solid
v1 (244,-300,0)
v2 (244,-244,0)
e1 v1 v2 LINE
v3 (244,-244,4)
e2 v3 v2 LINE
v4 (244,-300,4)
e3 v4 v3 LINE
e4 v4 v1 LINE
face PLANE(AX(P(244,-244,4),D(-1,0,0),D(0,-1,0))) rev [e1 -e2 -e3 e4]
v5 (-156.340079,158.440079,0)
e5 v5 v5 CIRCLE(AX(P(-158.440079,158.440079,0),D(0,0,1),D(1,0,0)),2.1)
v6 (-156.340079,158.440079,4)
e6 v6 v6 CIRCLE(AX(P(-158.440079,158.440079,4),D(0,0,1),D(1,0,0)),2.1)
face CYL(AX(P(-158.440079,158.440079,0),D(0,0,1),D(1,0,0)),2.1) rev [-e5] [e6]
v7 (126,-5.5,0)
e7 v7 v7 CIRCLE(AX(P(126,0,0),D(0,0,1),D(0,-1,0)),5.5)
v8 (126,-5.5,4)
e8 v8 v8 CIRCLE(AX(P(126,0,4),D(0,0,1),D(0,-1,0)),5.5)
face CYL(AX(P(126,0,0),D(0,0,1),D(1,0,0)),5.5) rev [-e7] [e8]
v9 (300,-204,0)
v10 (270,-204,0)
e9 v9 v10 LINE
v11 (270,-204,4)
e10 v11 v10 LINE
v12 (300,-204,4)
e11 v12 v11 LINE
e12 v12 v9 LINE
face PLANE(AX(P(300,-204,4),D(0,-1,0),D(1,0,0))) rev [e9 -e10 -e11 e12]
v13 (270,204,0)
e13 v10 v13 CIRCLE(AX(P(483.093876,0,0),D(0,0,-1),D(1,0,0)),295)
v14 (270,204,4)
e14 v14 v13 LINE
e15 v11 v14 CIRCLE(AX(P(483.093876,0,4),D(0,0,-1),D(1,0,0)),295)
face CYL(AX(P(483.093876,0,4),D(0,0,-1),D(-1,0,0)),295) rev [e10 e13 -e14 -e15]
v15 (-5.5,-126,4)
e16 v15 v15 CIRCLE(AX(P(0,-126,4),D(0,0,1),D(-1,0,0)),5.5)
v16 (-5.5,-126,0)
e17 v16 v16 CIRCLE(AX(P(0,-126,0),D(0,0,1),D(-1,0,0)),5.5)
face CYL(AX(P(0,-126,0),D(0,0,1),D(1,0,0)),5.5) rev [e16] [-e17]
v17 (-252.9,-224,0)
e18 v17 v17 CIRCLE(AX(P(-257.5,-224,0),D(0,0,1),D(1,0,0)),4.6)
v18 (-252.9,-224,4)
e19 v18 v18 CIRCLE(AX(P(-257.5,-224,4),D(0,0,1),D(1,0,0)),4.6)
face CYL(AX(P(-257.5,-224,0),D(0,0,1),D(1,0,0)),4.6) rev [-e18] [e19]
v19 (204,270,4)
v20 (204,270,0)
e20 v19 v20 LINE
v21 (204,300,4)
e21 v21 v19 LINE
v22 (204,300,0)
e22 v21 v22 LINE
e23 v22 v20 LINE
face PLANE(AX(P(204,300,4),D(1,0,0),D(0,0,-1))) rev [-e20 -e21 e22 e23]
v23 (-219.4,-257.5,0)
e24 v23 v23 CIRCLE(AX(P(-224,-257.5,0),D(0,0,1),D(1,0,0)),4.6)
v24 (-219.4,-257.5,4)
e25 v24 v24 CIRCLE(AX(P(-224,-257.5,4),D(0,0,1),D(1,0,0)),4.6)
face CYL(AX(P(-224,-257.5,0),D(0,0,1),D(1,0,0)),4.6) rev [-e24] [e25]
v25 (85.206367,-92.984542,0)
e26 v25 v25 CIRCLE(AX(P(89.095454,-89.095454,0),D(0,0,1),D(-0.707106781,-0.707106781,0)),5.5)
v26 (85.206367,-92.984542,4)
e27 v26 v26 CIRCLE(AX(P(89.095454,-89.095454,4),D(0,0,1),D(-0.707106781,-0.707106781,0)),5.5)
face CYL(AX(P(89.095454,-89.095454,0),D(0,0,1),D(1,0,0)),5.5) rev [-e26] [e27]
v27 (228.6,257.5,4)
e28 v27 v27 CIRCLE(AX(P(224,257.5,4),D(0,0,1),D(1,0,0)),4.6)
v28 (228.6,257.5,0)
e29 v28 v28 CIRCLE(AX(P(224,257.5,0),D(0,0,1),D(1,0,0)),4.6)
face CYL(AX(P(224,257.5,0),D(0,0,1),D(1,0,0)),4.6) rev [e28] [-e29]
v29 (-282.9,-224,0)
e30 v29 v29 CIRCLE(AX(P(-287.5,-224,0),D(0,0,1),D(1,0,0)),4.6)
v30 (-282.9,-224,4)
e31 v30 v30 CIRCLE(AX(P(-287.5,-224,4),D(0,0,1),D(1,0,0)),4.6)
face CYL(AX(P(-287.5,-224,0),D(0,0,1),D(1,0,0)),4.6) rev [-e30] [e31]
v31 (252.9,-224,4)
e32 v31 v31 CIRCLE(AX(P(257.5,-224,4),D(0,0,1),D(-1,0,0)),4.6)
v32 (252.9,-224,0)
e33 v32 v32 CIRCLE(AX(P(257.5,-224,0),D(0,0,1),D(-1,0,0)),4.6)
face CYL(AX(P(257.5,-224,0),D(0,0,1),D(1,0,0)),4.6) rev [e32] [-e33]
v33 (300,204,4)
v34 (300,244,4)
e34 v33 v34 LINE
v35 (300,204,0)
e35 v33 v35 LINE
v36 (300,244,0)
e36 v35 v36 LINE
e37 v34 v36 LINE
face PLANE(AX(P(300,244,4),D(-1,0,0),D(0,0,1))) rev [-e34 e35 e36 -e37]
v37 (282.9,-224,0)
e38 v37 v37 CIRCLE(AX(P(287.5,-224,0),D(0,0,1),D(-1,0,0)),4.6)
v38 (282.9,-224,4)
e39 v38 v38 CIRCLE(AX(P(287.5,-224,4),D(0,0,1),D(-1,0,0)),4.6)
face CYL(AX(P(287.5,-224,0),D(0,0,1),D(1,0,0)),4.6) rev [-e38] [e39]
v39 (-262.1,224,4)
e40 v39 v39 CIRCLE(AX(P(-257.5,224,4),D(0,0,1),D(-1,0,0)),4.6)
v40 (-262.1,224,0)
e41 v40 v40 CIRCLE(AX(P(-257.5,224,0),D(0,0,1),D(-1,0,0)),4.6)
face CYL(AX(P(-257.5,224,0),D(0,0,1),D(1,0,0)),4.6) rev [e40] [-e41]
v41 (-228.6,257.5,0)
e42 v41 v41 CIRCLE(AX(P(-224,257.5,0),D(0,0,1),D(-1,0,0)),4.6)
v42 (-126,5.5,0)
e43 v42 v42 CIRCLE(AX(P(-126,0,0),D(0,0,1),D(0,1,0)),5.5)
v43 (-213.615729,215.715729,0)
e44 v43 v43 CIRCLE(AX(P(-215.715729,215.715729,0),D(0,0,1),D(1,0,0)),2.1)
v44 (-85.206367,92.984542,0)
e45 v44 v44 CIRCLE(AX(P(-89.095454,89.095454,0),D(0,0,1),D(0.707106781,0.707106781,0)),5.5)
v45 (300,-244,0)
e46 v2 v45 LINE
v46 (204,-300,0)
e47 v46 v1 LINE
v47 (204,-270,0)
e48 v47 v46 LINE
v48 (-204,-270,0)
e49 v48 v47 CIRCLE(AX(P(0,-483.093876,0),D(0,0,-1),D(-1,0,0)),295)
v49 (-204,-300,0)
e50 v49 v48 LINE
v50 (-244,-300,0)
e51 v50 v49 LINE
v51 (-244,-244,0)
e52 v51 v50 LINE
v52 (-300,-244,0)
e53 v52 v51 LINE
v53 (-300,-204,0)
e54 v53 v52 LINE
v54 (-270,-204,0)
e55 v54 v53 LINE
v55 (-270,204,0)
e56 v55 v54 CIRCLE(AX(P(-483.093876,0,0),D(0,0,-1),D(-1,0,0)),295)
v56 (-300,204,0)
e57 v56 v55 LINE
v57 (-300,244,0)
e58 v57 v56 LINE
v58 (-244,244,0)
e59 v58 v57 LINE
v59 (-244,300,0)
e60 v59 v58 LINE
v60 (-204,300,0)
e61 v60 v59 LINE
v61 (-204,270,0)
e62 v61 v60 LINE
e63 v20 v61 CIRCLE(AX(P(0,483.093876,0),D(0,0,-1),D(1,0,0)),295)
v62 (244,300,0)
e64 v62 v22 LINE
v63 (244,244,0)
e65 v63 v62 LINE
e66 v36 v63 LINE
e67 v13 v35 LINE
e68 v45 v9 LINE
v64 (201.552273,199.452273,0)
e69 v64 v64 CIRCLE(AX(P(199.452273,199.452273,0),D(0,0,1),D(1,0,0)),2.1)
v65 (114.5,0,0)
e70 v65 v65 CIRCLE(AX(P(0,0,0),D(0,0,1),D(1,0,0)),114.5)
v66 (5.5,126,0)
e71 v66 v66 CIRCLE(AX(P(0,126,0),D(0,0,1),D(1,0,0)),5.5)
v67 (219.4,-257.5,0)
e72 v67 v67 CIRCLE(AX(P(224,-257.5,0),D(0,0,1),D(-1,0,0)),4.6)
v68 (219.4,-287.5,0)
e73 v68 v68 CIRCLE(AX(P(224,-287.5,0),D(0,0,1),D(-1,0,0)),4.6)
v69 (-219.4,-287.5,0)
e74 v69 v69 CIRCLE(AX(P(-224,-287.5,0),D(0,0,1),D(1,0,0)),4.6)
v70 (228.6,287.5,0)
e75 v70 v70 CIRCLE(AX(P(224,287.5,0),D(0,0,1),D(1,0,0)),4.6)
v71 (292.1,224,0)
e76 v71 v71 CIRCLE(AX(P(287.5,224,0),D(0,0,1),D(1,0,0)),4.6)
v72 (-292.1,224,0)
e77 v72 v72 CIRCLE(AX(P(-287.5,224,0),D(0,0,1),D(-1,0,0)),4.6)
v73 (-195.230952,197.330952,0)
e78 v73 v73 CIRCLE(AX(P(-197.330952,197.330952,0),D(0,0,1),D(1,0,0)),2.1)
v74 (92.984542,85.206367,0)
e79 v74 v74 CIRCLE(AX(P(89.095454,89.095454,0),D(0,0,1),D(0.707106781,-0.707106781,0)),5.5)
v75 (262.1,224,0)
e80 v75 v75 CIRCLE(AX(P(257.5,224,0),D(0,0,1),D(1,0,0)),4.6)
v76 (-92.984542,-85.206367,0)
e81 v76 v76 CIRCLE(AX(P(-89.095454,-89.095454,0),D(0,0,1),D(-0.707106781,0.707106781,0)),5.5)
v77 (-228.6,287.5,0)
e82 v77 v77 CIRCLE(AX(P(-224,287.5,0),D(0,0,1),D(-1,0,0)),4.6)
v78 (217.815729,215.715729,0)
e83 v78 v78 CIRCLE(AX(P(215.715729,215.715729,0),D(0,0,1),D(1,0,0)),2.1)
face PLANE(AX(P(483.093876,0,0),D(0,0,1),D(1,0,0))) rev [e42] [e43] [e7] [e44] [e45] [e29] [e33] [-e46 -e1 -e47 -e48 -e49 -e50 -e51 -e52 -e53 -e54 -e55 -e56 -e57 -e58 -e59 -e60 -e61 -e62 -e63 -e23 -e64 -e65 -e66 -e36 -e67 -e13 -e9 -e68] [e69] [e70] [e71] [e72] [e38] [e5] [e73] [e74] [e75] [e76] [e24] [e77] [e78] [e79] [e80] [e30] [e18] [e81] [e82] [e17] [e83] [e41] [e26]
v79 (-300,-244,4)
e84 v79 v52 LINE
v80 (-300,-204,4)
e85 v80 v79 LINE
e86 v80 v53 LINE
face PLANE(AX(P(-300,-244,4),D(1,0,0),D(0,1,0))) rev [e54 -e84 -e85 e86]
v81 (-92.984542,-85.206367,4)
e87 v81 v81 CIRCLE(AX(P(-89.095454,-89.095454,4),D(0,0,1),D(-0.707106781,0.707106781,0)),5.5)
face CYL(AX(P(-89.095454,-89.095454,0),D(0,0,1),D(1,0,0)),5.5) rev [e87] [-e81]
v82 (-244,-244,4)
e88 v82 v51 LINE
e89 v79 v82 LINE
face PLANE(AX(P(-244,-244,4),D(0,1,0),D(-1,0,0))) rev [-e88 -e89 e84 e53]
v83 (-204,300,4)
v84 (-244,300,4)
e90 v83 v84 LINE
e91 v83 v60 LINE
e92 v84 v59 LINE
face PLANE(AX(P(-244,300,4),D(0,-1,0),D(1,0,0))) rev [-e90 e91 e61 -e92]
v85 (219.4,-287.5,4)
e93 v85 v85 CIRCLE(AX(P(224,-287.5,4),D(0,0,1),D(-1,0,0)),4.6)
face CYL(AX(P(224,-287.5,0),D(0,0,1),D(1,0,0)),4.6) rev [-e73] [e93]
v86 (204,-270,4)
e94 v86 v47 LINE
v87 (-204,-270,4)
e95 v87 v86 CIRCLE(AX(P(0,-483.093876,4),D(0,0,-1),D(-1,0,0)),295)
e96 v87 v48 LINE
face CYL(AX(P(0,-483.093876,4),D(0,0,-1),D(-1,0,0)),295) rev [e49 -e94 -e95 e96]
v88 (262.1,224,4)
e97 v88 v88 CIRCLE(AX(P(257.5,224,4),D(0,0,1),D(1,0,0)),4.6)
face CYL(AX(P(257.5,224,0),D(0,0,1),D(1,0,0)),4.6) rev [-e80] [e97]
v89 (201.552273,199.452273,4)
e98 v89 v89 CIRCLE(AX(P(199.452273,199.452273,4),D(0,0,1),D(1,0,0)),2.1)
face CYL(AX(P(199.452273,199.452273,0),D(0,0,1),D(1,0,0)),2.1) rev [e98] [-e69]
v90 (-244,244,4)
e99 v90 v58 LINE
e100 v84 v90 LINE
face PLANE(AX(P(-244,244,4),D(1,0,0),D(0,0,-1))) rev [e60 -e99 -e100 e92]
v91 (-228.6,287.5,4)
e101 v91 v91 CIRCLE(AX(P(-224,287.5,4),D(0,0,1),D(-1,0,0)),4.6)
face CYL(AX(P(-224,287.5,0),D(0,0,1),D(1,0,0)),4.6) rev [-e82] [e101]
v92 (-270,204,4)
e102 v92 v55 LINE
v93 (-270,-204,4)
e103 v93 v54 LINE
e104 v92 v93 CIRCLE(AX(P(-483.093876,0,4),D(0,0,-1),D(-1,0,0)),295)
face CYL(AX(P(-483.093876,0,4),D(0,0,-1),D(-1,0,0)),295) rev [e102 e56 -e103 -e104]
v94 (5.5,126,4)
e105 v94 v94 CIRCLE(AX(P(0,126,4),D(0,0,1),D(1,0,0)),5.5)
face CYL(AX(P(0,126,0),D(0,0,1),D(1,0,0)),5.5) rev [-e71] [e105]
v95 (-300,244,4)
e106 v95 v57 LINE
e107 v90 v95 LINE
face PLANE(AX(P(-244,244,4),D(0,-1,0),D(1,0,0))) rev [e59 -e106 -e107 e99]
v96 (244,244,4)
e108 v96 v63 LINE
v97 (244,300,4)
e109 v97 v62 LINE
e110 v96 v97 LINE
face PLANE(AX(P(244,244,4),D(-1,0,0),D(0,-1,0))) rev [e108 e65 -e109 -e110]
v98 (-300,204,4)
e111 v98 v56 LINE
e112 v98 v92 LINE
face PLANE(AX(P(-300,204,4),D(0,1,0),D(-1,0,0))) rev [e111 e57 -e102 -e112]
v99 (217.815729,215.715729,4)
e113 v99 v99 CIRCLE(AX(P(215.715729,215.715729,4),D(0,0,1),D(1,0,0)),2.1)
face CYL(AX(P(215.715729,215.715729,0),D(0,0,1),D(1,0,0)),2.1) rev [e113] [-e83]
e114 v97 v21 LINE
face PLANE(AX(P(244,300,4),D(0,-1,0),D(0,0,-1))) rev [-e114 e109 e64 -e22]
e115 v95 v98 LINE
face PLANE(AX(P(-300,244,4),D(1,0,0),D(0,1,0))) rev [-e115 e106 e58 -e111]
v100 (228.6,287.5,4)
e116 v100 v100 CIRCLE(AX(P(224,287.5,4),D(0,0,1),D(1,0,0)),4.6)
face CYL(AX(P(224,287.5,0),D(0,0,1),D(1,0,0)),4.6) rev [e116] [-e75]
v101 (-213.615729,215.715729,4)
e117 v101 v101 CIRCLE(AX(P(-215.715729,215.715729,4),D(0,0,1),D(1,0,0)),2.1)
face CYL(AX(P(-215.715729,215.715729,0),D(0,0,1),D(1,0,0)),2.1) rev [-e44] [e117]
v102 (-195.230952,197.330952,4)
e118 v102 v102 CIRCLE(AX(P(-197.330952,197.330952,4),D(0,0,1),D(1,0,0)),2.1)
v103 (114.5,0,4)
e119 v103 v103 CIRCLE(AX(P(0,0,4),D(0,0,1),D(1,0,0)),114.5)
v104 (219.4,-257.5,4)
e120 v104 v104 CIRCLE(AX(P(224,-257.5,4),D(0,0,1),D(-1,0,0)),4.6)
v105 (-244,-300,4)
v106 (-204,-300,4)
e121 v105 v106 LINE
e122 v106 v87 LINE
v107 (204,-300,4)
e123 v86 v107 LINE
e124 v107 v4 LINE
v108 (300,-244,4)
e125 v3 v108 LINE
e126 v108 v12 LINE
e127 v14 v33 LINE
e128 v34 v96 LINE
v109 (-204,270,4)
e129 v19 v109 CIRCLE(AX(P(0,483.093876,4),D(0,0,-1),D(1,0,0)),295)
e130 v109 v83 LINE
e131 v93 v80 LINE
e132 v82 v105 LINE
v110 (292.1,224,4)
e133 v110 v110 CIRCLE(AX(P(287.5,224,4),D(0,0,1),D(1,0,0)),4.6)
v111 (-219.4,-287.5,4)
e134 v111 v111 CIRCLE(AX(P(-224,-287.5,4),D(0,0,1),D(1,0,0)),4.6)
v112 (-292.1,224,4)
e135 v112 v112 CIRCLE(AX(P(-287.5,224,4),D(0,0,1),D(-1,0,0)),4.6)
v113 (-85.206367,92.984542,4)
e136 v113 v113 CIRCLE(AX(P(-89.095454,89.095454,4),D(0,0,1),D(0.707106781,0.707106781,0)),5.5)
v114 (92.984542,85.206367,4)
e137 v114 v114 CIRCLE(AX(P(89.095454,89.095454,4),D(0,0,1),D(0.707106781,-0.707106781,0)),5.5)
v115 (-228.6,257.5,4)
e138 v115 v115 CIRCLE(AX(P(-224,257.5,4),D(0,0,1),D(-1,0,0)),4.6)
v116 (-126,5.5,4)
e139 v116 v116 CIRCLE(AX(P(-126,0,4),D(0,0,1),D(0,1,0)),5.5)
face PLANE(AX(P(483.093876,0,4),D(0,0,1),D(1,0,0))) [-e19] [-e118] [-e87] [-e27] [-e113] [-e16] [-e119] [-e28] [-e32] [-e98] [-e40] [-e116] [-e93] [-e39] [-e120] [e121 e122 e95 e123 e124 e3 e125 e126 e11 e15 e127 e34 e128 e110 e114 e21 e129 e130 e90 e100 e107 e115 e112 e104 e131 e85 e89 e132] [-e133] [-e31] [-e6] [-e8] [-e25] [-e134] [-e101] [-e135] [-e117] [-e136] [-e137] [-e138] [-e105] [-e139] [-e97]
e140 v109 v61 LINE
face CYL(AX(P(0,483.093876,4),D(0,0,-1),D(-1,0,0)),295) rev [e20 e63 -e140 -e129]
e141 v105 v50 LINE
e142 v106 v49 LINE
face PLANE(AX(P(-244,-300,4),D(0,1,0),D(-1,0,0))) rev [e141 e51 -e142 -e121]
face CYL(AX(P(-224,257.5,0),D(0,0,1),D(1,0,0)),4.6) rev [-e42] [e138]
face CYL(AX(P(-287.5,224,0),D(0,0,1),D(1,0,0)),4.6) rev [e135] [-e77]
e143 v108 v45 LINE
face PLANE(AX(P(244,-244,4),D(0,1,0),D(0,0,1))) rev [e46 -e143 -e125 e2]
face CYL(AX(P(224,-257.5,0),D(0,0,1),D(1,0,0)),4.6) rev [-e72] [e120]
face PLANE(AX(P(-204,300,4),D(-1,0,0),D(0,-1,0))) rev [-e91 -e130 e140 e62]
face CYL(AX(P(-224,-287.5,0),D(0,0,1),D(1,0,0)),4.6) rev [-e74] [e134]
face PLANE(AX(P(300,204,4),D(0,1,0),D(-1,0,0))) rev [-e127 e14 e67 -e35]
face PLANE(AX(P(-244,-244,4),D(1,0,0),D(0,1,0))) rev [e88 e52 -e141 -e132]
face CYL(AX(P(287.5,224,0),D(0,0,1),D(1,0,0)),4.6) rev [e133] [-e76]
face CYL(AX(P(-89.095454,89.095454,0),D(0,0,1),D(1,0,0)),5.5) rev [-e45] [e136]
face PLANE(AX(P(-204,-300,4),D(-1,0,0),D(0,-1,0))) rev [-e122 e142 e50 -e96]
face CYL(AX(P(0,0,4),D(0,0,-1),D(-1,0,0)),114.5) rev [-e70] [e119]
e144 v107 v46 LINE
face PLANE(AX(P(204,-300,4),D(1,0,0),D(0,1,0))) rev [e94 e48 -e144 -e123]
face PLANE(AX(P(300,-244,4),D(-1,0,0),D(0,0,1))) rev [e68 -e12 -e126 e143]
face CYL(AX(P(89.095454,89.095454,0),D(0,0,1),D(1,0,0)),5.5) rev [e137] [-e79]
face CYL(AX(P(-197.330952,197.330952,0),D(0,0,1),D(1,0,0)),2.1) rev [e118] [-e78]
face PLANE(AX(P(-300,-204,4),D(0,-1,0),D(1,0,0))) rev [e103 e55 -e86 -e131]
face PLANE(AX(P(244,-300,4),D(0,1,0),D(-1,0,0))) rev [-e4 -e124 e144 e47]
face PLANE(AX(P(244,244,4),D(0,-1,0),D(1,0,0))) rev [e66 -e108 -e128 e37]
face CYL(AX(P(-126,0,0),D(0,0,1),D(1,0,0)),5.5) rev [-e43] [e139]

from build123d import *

# Parameters (mm, degrees)
SKETCH1_R          = 114.5
BASE_FLANGE1_DEPTH = 4
SKETCH2_R          = 4.6
EXTRUDE1_DEPTH     = 4
SKETCH3_R          = 5.5
EXTRUDE2_DEPTH     = 4
CIRPATTERN1_COUNT  = 8
SKETCH4_R          = 2.1
CUT_EXTRUDE1_DEPTH = 10


# Sheet-metal steps are written as plain solids
with BuildPart() as part:
    # Sketch1 → Base-Flange1 (new body)
    with BuildSketch(Plane.XY):
        with BuildLine():
            Line((244, 244), (244, 300))
            Line((244, 300), (204, 300))
            Line((204, 300), (204, 270))
            ThreePointArc((204, 270), (0, 188.093876027), (-204, 270))
            Line((-204, 270), (-204, 300))
            Line((-204, 300), (-244, 300))
            Line((-244, 300), (-244, 244))
            Line((-244, 244), (-300, 244))
            Line((-300, 244), (-300, 204))
            Line((-300, 204), (-270, 204))
            ThreePointArc((-270, 204), (-188.093876027, 0), (-270, -204))
            Line((-270, -204), (-300, -204))
            Line((-300, -204), (-300, -244))
            Line((-300, -244), (-244, -244))
            Line((-244, -244), (-244, -300))
            Line((-244, -300), (-204, -300))
            Line((-204, -300), (-204, -270))
            ThreePointArc((-204, -270), (0, -188.093876027), (204, -270))
            Line((204, -270), (204, -300))
            Line((204, -300), (244, -300))
            Line((244, -300), (244, -244))
            Line((244, -244), (300, -244))
            Line((300, -244), (300, -204))
            Line((300, -204), (270, -204))
            ThreePointArc((270, -204), (188.093876027, 0), (270, 204))
            Line((270, 204), (300, 204))
            Line((300, 204), (300, 244))
            Line((300, 244), (244, 244))
        make_face()
        Circle(SKETCH1_R, mode=Mode.SUBTRACT)
    extrude(amount=BASE_FLANGE1_DEPTH)

    # Sketch2 → Extrude1 (cut)
    with BuildSketch(Plane.XY.offset(4)):
        with Locations((224, 287.5)):
            Circle(SKETCH2_R)
        with Locations((224, 257.5)):
            Circle(SKETCH2_R)
        with Locations((257.5, 224)):
            Circle(SKETCH2_R)
        with Locations((287.5, 224)):
            Circle(SKETCH2_R)
        with Locations(Location((287.5, -224, 0), (0, 0, 180))):
            Circle(SKETCH2_R)
        with Locations(Location((257.5, -224, 0), (0, 0, 180))):
            Circle(SKETCH2_R)
        with Locations(Location((224, -257.5, 0), (0, 0, 180))):
            Circle(SKETCH2_R)
        with Locations(Location((224, -287.5, 0), (0, 0, 180))):
            Circle(SKETCH2_R)
        with Locations((-224, -287.5)):
            Circle(SKETCH2_R)
        with Locations((-224, -257.5)):
            Circle(SKETCH2_R)
        with Locations((-257.5, -224)):
            Circle(SKETCH2_R)
        with Locations((-287.5, -224)):
            Circle(SKETCH2_R)
        with Locations(Location((-287.5, 224, 0), (0, 0, 180))):
            Circle(SKETCH2_R)
        with Locations(Location((-257.5, 224, 0), (0, 0, 180))):
            Circle(SKETCH2_R)
        with Locations(Location((-224, 257.5, 0), (0, 0, 180))):
            Circle(SKETCH2_R)
        with Locations(Location((-224, 287.5, 0), (0, 0, 180))):
            Circle(SKETCH2_R)
    extrude(amount=-EXTRUDE1_DEPTH, mode=Mode.SUBTRACT)

    # Sketch3 → Extrude2 (cut)
    with BuildSketch(Plane.XY.offset(4)):
        with Locations((0, 126)):
            Circle(SKETCH3_R)
    extrude2 = extrude(amount=-EXTRUDE2_DEPTH, mode=Mode.SUBTRACT)

    # CirPattern1: Extrude2 ×8 about axis
    cirpattern1_axis = Axis((0, 0, 0), (0, 0, 1))
    for i in range(1, CIRPATTERN1_COUNT):
        add(extrude2.rotate(cirpattern1_axis, i * 360 / CIRPATTERN1_COUNT), mode=Mode.SUBTRACT)

    # Sketch4 → Cut-Extrude1 (cut)
    with BuildSketch(Plane.XY.offset(4)):
        with Locations((215.715728753, 215.715728753)):
            Circle(SKETCH4_R)
        with Locations((199.452272785, 199.452272785)):
            Circle(SKETCH4_R)
        with Locations((-158.440079476, 158.440079476)):
            Circle(SKETCH4_R)
        with Locations((-215.715728753, 215.715728753)):
            Circle(SKETCH4_R)
        with Locations((-197.330952442, 197.330952442)):
            Circle(SKETCH4_R)
    extrude(amount=-CUT_EXTRUDE1_DEPTH, mode=Mode.SUBTRACT)


solid = part.part
